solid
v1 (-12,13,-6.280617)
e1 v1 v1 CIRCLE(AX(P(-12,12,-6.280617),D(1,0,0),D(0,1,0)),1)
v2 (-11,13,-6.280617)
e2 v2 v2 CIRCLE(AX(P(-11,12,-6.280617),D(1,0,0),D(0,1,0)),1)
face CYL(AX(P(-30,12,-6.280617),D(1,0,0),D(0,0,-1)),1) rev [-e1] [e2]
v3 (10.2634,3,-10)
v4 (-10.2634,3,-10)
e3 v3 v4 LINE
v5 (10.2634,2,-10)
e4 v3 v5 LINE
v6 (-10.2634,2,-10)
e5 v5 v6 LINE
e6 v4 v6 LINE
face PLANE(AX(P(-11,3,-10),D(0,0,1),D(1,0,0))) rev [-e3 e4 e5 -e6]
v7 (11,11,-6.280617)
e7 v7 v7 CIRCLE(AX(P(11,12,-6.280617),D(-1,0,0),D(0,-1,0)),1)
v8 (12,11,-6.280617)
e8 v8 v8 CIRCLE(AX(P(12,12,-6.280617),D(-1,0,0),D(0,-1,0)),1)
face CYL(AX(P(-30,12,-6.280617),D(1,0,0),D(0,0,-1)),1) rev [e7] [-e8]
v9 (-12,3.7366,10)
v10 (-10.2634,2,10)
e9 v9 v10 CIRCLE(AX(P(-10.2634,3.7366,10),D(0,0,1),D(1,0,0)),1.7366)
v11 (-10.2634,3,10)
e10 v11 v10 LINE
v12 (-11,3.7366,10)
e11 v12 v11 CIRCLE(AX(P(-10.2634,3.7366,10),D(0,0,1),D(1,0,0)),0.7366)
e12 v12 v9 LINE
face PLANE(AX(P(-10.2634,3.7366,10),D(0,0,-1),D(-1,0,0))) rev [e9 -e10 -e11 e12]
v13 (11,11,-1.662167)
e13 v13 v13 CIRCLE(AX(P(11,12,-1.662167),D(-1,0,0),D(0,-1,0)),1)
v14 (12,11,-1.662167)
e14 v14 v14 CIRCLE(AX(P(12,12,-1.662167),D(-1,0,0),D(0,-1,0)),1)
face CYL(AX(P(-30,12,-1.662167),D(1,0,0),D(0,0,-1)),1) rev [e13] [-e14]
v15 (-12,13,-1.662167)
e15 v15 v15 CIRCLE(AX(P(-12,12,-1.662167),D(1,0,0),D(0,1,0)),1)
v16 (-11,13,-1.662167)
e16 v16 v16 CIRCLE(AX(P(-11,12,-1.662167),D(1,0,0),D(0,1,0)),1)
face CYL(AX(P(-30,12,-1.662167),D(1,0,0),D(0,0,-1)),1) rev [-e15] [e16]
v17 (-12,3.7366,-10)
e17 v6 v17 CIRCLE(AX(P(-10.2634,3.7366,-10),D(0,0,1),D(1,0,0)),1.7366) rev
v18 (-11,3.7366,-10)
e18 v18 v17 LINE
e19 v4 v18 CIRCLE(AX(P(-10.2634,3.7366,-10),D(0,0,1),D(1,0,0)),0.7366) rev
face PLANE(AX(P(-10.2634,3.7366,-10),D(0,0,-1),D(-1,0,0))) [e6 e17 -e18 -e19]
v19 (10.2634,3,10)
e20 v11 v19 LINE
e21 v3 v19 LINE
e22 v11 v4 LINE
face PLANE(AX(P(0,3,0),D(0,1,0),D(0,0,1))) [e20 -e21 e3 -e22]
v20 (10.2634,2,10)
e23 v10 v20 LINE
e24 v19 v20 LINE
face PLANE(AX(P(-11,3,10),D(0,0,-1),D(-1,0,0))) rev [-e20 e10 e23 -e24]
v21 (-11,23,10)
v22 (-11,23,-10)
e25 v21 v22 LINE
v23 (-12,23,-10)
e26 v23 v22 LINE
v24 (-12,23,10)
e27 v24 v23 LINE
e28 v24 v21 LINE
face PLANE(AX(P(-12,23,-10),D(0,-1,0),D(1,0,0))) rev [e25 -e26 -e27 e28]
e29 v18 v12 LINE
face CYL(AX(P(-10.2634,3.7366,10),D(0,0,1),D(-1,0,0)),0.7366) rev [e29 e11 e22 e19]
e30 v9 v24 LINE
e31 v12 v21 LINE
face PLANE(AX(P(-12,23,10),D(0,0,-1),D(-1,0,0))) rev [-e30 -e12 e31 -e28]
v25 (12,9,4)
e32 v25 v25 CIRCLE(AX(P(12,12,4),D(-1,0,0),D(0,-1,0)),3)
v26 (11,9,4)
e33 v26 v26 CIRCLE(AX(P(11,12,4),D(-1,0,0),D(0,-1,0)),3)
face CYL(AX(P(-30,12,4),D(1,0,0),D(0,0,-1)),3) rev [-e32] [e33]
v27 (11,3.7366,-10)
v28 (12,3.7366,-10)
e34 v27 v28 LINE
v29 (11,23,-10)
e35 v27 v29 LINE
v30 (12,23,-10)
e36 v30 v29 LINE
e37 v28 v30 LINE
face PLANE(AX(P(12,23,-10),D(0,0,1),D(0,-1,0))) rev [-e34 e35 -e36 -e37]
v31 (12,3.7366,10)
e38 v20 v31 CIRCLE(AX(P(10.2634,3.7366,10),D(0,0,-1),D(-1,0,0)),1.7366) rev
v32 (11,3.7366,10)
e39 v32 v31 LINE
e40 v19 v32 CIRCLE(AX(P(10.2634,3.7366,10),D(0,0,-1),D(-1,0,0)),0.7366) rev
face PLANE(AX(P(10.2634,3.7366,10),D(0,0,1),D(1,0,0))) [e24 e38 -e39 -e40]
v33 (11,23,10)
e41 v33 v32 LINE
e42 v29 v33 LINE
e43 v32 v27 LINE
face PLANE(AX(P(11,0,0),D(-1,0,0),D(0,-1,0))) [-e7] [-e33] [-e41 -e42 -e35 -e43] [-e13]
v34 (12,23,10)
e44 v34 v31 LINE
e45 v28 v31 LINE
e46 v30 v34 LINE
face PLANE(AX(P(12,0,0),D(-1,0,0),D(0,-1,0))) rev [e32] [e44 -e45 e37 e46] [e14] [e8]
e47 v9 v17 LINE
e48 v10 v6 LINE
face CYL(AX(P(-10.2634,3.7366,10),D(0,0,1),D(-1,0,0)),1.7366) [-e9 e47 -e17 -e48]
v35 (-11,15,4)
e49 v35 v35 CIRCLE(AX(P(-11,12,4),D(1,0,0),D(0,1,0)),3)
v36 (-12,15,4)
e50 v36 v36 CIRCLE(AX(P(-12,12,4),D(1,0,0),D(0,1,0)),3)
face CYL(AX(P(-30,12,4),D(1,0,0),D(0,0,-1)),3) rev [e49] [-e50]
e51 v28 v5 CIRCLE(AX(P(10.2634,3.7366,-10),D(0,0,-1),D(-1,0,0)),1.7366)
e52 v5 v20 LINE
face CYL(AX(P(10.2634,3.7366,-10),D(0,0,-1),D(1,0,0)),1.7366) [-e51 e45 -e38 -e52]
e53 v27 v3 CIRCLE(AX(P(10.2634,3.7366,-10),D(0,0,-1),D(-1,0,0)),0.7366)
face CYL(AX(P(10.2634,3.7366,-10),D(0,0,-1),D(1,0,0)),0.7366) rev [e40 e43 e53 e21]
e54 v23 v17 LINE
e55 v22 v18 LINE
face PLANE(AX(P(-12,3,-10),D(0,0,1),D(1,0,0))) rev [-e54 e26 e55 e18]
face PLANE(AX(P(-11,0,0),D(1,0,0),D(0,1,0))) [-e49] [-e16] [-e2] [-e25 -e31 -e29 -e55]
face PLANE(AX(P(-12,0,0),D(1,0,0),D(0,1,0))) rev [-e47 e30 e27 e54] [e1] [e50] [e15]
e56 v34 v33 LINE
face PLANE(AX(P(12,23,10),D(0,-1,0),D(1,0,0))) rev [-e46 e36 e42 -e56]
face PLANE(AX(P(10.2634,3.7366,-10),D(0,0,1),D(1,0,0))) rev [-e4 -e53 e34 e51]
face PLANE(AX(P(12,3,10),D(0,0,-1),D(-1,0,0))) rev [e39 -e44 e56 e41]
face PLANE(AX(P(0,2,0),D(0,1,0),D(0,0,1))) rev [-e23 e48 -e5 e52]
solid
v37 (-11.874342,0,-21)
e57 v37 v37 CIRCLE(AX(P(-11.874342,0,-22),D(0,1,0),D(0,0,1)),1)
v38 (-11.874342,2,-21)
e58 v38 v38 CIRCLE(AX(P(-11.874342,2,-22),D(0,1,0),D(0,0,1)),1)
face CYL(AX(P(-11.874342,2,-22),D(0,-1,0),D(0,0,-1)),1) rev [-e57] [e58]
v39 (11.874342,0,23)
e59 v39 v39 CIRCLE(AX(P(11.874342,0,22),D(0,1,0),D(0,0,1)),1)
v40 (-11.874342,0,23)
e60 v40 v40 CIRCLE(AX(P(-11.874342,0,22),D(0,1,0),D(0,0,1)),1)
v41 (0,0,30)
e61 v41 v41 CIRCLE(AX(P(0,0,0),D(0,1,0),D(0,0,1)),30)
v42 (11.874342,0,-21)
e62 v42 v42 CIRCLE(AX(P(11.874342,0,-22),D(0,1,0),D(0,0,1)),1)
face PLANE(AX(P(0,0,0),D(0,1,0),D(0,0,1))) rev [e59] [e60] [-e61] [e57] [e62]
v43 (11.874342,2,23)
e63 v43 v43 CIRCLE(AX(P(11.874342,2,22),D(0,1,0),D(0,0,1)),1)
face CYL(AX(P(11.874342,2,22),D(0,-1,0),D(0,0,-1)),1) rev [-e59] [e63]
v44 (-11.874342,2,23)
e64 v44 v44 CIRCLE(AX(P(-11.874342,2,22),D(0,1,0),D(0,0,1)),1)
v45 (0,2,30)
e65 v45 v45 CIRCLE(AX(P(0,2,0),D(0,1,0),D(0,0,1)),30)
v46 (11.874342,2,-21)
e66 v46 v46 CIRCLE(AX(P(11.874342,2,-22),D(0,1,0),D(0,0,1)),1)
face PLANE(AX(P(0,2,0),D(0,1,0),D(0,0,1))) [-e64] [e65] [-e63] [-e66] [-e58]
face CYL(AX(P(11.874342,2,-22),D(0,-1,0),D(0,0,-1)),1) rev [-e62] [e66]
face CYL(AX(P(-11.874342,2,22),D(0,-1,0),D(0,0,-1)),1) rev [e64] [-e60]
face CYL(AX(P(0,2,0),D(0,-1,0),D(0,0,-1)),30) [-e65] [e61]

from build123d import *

# Parameters (mm, degrees)
SKETCH3_R                      = 30
SKETCH3_R_2                    = 1
BOSS_EXTRUDE1_DEPTH            = 2
SKETCH4_W                      = 22
SKETCH4_H                      = 20
BASE_FLANGE1_DEPTH             = 1
EDGE_FLANGE1_STRIP_W           = 5.4732
EDGE_FLANGE1_STRIP_H           = 1
EDGE_FLANGE1_STRIP_CUT_DEPTH   = 20
EDGE_FLANGE1_STRIP_2_W         = 5.4732
EDGE_FLANGE1_STRIP_2_H         = 1
EDGE_FLANGE1_STRIP_CUT_2_DEPTH = 20
EDGE_FLANGE1_DEPTH             = 20
EDGE_FLANGE1_BEND_DEPTH        = 20
CUT_EXTRUDE1_DEPTH             = 49.259714048
CUT_EXTRUDE1_DEPTH_BACK        = 49.259714048
SKETCH17_R                     = 3
SKETCH17_R_2                   = 1


# Sheet-metal steps are written as plain solids
with BuildPart() as part:
    # Sketch3 → Boss-Extrude1 (new body)
    with BuildSketch(Plane(origin=(0, 0, 0), x_dir=(1, 0, 0), z_dir=(0, 1, 0))):
        with Locations(Location((0, 0, 0), (0, 0, 270))):
            Circle(SKETCH3_R)
        with Locations(Location((-11.874342087, 22, 0), (0, 0, 270))):
            Circle(SKETCH3_R_2, mode=Mode.SUBTRACT)
        with Locations(Location((11.874342087, 22, 0), (0, 0, 270))):
            Circle(SKETCH3_R_2, mode=Mode.SUBTRACT)
        with Locations(Location((11.874342087, -22, 0), (0, 0, 270))):
            Circle(SKETCH3_R_2, mode=Mode.SUBTRACT)
        with Locations(Location((-11.874342087, -22, 0), (0, 0, 270))):
            Circle(SKETCH3_R_2, mode=Mode.SUBTRACT)
    extrude(amount=BOSS_EXTRUDE1_DEPTH)


with BuildPart() as body_2:
    # Sketch4 → Base-Flange1 (new body)
    with BuildSketch(Plane(origin=(0, 2, 0), x_dir=(1, 0, 0), z_dir=(0, 1, 0))):
        Rectangle(SKETCH4_W, SKETCH4_H)
    extrude(amount=BASE_FLANGE1_DEPTH)

    # Edge-Flange1 strip (across the edge) → Edge-Flange1 strip cut (cut)
    with BuildSketch(Plane(origin=(-11, 3, -10), x_dir=(1, 0, 0), z_dir=(0, 0, 1))):
        with Locations((-2, -0.5)):
            Rectangle(EDGE_FLANGE1_STRIP_W, EDGE_FLANGE1_STRIP_H)
    extrude(amount=EDGE_FLANGE1_STRIP_CUT_DEPTH, mode=Mode.SUBTRACT)

    # Edge-Flange1 strip 2 (across the edge) → Edge-Flange1 strip cut 2 (cut)
    with BuildSketch(Plane(origin=(11, 3, 10), x_dir=(-1, 0, 0), z_dir=(0, 0, -1))):
        with Locations((-2, -0.5)):
            Rectangle(EDGE_FLANGE1_STRIP_2_W, EDGE_FLANGE1_STRIP_2_H)
    extrude(amount=EDGE_FLANGE1_STRIP_CUT_2_DEPTH, mode=Mode.SUBTRACT)

    # Edge-Flange1 section (across the edge) → Edge-Flange1 (add)
    with BuildSketch(Plane(origin=(-11, 3, -10), x_dir=(1, 0, 0), z_dir=(0, 0, 1))):
        with BuildLine():
            Line((-1, 0.7366), (-1, 20))
            Line((-1, 20), (0, 20))
            Line((0, 20), (0, 0.7366))
            ThreePointArc((0, 0.7366), (0.215745145, 0.215745145), (0.7366, 0))
            Line((0.7366, 0), (0.7366, -1))
            ThreePointArc((0.7366, -1), (-0.491361636, -0.491361636), (-1, 0.7366))
        make_face()
    extrude(amount=EDGE_FLANGE1_DEPTH)

    # Edge-Flange1 section 2 (across the edge) → Edge-Flange1 bend (add)
    with BuildSketch(Plane(origin=(11, 3, 10), x_dir=(-1, 0, 0), z_dir=(0, 0, -1))):
        with BuildLine():
            Line((-1, 0.7366), (-1, 20))
            Line((-1, 20), (0, 20))
            Line((0, 20), (0, 0.7366))
            ThreePointArc((0, 0.7366), (0.215745145, 0.215745145), (0.7366, 0))
            Line((0.7366, 0), (0.7366, -1))
            ThreePointArc((0.7366, -1), (-0.491361636, -0.491361636), (-1, 0.7366))
        make_face()
    extrude(amount=EDGE_FLANGE1_BEND_DEPTH)

    # Sketch17 → Cut-Extrude1 (cut, two sides: drawn at the far end of the back side and taken through both)
    with BuildSketch(Plane(origin=(0, 0, 0), x_dir=(0, 0, -1), z_dir=(1, 0, 0)).offset(-CUT_EXTRUDE1_DEPTH_BACK)):
        with Locations(Location((-4, 12, 0), (0, 0, 270))):
            Circle(SKETCH17_R)
        with Locations(Location((1.662167446, 12, 0), (0, 0, 270))):
            Circle(SKETCH17_R_2)
        with Locations(Location((6.280617318, 12, 0), (0, 0, 270))):
            Circle(SKETCH17_R_2)
    extrude(amount=CUT_EXTRUDE1_DEPTH + CUT_EXTRUDE1_DEPTH_BACK, mode=Mode.SUBTRACT)


solid = Compound([part.part, body_2.part])
